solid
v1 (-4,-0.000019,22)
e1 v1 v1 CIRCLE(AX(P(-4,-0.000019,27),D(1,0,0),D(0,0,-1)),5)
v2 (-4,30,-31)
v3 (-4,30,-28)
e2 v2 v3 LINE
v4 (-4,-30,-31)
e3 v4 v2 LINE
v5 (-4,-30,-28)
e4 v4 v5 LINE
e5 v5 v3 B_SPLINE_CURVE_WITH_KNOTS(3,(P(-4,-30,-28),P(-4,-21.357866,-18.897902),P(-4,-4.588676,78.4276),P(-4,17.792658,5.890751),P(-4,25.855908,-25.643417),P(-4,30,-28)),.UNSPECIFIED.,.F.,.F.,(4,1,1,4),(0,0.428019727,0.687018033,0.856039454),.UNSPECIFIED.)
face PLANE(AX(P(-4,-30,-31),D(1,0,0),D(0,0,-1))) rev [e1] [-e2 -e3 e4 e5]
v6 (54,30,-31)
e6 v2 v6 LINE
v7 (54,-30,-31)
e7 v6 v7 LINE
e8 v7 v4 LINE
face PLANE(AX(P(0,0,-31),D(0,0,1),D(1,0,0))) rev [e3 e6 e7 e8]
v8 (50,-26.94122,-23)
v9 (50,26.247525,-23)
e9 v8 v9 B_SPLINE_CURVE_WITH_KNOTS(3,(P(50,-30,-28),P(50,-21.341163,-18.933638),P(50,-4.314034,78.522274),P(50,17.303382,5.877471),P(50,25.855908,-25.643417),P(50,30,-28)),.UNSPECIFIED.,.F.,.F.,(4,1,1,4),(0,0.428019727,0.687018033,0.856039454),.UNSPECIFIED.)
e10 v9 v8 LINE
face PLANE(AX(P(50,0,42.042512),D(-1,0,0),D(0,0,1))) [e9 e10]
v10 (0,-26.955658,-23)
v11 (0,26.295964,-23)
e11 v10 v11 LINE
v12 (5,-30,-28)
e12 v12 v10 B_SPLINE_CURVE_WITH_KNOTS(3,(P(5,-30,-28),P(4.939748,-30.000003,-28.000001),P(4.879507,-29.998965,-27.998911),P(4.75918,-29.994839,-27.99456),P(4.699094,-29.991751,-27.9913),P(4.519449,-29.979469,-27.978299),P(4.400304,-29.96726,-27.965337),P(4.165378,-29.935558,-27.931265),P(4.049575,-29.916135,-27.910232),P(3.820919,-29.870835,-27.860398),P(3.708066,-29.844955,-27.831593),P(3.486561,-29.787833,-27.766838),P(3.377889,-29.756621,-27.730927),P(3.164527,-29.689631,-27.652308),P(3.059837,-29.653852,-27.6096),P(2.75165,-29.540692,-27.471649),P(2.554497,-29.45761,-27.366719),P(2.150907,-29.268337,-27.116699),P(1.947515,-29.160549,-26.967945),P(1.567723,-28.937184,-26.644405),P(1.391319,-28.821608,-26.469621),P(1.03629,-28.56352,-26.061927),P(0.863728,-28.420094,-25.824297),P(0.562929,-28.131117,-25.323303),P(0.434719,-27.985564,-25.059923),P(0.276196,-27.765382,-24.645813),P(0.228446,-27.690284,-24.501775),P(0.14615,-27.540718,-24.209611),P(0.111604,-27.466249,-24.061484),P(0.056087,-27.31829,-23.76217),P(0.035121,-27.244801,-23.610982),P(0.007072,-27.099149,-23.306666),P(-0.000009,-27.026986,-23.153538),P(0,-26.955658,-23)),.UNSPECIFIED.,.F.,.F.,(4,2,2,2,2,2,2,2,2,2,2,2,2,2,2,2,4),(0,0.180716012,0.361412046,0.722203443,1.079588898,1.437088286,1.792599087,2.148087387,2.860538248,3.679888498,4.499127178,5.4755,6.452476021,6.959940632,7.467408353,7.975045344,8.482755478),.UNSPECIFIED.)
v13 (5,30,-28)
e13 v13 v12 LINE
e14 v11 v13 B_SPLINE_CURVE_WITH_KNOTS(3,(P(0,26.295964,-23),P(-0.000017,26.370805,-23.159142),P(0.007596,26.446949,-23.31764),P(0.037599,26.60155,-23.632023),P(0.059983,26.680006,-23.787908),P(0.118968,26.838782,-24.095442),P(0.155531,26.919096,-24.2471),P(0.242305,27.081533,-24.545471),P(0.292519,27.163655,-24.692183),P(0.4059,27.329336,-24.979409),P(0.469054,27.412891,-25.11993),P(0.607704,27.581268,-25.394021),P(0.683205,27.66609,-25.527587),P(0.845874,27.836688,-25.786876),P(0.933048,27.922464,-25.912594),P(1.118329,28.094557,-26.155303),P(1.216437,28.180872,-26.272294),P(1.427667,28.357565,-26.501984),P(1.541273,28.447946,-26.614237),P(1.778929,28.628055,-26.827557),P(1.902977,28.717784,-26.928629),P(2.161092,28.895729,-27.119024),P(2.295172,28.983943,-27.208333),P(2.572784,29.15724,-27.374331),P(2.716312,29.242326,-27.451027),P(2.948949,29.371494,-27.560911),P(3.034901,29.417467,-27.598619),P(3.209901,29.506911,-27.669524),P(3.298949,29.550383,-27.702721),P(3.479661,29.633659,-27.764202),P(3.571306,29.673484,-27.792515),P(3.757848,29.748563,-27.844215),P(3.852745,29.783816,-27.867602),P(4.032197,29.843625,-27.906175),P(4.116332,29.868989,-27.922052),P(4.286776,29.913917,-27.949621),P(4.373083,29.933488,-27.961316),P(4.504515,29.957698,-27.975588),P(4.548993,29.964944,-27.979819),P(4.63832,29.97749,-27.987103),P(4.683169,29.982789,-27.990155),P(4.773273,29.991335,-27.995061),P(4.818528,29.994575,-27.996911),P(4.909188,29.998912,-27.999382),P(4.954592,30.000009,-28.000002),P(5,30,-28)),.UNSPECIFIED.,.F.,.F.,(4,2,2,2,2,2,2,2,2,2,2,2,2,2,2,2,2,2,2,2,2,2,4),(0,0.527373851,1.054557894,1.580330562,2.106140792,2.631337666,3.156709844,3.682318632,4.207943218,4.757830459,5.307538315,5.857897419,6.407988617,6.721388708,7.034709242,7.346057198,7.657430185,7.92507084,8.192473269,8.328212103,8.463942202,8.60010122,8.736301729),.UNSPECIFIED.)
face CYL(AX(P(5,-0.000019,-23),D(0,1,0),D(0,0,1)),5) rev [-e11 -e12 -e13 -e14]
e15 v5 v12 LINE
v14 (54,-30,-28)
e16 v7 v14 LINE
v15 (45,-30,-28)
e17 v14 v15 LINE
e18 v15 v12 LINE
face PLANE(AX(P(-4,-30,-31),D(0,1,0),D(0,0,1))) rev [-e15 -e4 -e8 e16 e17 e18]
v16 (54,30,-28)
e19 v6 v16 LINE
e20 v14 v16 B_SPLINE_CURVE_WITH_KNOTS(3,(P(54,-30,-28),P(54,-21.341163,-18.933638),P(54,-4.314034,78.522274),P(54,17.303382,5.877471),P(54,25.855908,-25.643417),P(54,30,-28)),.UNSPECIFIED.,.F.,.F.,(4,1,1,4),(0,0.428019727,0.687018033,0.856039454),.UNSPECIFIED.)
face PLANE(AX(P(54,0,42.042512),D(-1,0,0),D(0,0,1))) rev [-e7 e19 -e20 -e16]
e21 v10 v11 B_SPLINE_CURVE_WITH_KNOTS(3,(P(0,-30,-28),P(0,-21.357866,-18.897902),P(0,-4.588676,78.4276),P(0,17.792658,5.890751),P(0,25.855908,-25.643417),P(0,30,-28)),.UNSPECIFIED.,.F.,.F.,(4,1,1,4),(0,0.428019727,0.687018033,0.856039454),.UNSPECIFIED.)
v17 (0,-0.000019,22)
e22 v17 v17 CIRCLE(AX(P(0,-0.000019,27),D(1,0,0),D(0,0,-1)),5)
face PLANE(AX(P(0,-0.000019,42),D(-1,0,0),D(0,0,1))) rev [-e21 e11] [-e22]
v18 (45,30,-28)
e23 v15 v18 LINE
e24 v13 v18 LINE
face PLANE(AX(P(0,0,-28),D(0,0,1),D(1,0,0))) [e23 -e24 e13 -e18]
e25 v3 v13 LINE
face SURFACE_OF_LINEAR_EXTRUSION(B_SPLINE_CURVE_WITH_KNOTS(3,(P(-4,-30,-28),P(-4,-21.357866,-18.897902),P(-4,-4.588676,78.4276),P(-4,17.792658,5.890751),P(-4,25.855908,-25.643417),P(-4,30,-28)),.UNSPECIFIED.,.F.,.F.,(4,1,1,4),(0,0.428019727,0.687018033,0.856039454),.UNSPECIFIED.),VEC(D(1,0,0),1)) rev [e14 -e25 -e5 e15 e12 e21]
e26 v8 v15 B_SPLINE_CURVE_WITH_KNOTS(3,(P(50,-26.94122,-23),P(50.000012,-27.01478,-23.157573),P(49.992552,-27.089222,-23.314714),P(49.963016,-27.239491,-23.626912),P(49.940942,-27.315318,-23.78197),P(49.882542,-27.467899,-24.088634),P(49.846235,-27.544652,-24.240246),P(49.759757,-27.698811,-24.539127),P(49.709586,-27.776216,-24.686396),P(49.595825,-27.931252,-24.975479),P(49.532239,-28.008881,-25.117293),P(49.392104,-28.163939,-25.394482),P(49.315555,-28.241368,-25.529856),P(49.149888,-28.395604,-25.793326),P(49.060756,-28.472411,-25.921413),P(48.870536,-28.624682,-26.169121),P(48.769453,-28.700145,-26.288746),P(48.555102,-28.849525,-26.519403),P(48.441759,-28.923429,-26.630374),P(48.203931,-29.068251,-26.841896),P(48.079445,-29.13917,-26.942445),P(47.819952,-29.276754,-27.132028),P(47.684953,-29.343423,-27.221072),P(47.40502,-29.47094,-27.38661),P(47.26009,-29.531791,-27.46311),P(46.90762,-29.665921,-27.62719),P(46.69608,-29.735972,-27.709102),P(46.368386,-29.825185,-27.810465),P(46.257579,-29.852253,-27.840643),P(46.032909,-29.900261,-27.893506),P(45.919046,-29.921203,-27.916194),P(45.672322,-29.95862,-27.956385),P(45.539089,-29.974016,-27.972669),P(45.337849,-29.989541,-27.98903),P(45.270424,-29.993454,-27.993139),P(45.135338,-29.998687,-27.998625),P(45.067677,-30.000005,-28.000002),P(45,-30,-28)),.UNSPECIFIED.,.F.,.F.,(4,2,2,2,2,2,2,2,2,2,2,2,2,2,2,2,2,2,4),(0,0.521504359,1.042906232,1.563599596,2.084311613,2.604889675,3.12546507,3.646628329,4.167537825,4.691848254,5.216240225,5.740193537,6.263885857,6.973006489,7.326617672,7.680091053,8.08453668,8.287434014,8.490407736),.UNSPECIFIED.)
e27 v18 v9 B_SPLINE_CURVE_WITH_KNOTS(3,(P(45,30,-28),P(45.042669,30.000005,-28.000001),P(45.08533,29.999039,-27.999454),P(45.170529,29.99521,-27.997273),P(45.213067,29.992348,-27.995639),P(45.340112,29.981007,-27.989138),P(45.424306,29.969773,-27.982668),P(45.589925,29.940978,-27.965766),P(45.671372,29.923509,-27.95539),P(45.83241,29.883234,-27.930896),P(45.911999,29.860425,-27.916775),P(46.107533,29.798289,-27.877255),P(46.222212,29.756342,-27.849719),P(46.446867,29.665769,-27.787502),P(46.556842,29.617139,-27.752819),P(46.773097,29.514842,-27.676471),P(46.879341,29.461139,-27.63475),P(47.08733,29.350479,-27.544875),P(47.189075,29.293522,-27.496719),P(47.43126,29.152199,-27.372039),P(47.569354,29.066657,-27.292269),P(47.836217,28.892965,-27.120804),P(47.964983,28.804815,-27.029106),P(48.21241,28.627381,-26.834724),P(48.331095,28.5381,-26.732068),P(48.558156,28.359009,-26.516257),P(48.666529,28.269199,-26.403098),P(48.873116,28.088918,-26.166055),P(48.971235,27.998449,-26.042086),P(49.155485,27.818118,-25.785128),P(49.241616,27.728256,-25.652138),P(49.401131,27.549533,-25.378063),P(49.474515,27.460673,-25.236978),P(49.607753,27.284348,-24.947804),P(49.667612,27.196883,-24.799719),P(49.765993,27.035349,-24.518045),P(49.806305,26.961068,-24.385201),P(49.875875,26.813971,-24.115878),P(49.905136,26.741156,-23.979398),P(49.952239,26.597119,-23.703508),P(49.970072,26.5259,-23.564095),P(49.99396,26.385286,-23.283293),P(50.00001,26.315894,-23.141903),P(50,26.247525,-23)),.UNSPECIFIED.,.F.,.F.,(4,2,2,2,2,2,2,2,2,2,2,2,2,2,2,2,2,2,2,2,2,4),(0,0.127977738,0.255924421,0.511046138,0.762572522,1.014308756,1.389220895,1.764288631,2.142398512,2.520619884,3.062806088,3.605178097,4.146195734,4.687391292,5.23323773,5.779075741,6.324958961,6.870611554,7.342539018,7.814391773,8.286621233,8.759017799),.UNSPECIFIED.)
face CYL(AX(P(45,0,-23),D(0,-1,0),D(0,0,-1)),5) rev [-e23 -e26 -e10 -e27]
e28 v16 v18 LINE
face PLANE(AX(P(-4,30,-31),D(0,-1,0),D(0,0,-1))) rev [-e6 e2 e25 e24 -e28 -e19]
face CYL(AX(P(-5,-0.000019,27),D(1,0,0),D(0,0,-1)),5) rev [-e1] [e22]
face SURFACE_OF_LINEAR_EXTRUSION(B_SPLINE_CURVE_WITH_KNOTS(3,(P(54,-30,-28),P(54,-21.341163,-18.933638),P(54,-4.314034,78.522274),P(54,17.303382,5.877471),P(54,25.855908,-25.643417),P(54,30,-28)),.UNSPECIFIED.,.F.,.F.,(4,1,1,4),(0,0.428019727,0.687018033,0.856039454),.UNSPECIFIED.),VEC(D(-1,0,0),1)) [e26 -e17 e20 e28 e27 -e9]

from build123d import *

# Parameters (mm, degrees)
BOSS_EXTRUDE1_DEPTH = 4
BOSS_EXTRUDE2_DEPTH = 4
SKETCH7_W           = 60
SKETCH7_H           = 58
BOSS_EXTRUDE3_DEPTH = 3
FILLET2_START       = -30.000000115
FILLET2_DEPTH       = 60.000000115
FILLET2_2_DEPTH     = 50
FILLET2_START_2     = 44.9999999
FILLET2_3_DEPTH     = 5.0000001
SKETCH2_4_R         = 5
CUT_EXTRUDE1_DEPTH  = 5


with BuildPart() as part:
    # Sketch6 → Boss-Extrude1 (new body)
    with BuildSketch(Plane.YZ.offset(50)):
        with BuildLine():
            Line((-30, -28), (30, -28))
            add(Edge.make_bspline(
                [(-30, -28), (-21.341162822, -18.933637736), (-4.314034272, 78.522274038), (17.303381943, 5.877471269), (25.855908326, -25.643416869), (30, -28)],
                knots=[0, 0, 0, 0, 0.428019727, 0.687018033, 0.856039454, 0.856039454, 0.856039454, 0.856039454], degree=3))
        make_face()
    extrude(amount=BOSS_EXTRUDE1_DEPTH)



with BuildPart() as body_2:
    # Sketch2 → Boss-Extrude2 (new body)
    with BuildSketch(Plane.YZ):
        with BuildLine():
            Line((-30, -28), (30, -28))
            add(Edge.make_bspline(
                [(-30, -28), (-21.357866352, -18.89790242), (-4.588676367, 78.427600294), (17.792657751, 5.890750685), (25.855908326, -25.643416869), (30, -28)],
                knots=[0, 0, 0, 0, 0.428019727, 0.687018033, 0.856039454, 0.856039454, 0.856039454, 0.856039454], degree=3))
        make_face()
    extrude(amount=-BOSS_EXTRUDE2_DEPTH)


with BuildPart() as part_1:
    add(part.part)

    add(body_2.part)  # Boss-Extrude3 merges body 2
    # Sketch7 → Boss-Extrude3 (add)
    with BuildSketch(Plane.YX.offset(28)):
        with Locations((0, 25)):
            Rectangle(SKETCH7_W, SKETCH7_H)
    extrude(amount=BOSS_EXTRUDE3_DEPTH)

    # Fillet2: read off the stored shape, not the designer's step
    # Fillet2 outline → Fillet2 (add)
    with BuildSketch(Plane(origin=(0, 0, 0), x_dir=(1, 0, 0), z_dir=(0, 1, 0)).offset(FILLET2_START)):
        with BuildLine():
            Line((50, 28), (45, 28))
            ThreePointArc((45, 28), (48.535533906, 26.535533906), (50, 23))
            Line((50, 23), (50, 28))
        make_face()
        with BuildLine():
            ThreePointArc((0, 23), (1.464466094, 26.535533906), (5, 28))
            Line((5, 28), (0, 28))
            Line((0, 28), (0, 23))
        make_face()
    extrude(amount=FILLET2_DEPTH)

    # Fillet2 2 outline → Fillet2 2 (cut)
    with BuildSketch(Plane.YZ):
        with BuildLine():
            Line((-26.955658307, -23), (-30.000000115, -23))
            Line((-30.000000115, -23), (-30, -28))
            add(Edge.make_bspline(
                [(-30, -28), (-29.008314276, -26.955533367), (-27.992857706, -25.232504786), (-26.955658307, -23)],
                knots=[0, 0, 0, 0, 0.049115308, 0.049115308, 0.049115308, 0.049115308], degree=3))
        make_face()
        with BuildLine():
            add(Edge.make_bspline(
                [(26.295963783, -23), (27.464737595, -25.485053142), (28.683961451, -27.251620261), (30, -28)],
                knots=[0.802363347, 0.802363347, 0.802363347, 0.802363347, 0.856039454, 0.856039454, 0.856039454, 0.856039454], degree=3))
            Line((30, -28), (30, -23))
            Line((30, -23), (26.295963783, -23))
        make_face()
    extrude(amount=FILLET2_2_DEPTH, mode=Mode.SUBTRACT)

    # Fillet2 3 outline → Fillet2 3 (cut)
    with BuildSketch(Plane.YZ.offset(FILLET2_START_2)):
        with BuildLine():
            add(Edge.make_bspline(
                [(-30, -28), (-29.008314276, -26.955533367), (-27.992857706, -25.232504786), (-26.955658307, -23)],
                knots=[0, 0, 0, 0, 0.049115308, 0.049115308, 0.049115308, 0.049115308], degree=3))
            add(Edge.make_bspline(
                [(-30, -28), (-29.005212581, -26.958393265), (-27.984696993, -25.23506108), (-26.941219534, -23)],
                knots=[0, 0, 0, 0, 0.049173882, 0.049173882, 0.049173882, 0.049173882], degree=3))
            Line((-26.941219534, -23), (-26.955658307, -23))
        make_face()
        with BuildLine():
            Line((26.295963783, -23), (26.247524945, -23))
            add(Edge.make_bspline(
                [(26.247524945, -23), (27.444892295, -25.485068916), (28.683770288, -27.251511554), (30, -28)],
                knots=[0.802355551, 0.802355551, 0.802355551, 0.802355551, 0.856039454, 0.856039454, 0.856039454, 0.856039454], degree=3))
            add(Edge.make_bspline(
                [(26.295963783, -23), (27.464737595, -25.485053142), (28.683961451, -27.251620261), (30, -28)],
                knots=[0.802363347, 0.802363347, 0.802363347, 0.802363347, 0.856039454, 0.856039454, 0.856039454, 0.856039454], degree=3))
        make_face()
    extrude(amount=FILLET2_3_DEPTH, mode=Mode.SUBTRACT)

    # Sketch2<4> → Cut-Extrude1 (cut)
    with BuildSketch(Plane.YZ):
        with Locations(Location((-1.9074e-05, 27, 0), (0, 0, 270))):
            Circle(SKETCH2_4_R)
    extrude(amount=-CUT_EXTRUDE1_DEPTH, mode=Mode.SUBTRACT)


solid = part_1.part
